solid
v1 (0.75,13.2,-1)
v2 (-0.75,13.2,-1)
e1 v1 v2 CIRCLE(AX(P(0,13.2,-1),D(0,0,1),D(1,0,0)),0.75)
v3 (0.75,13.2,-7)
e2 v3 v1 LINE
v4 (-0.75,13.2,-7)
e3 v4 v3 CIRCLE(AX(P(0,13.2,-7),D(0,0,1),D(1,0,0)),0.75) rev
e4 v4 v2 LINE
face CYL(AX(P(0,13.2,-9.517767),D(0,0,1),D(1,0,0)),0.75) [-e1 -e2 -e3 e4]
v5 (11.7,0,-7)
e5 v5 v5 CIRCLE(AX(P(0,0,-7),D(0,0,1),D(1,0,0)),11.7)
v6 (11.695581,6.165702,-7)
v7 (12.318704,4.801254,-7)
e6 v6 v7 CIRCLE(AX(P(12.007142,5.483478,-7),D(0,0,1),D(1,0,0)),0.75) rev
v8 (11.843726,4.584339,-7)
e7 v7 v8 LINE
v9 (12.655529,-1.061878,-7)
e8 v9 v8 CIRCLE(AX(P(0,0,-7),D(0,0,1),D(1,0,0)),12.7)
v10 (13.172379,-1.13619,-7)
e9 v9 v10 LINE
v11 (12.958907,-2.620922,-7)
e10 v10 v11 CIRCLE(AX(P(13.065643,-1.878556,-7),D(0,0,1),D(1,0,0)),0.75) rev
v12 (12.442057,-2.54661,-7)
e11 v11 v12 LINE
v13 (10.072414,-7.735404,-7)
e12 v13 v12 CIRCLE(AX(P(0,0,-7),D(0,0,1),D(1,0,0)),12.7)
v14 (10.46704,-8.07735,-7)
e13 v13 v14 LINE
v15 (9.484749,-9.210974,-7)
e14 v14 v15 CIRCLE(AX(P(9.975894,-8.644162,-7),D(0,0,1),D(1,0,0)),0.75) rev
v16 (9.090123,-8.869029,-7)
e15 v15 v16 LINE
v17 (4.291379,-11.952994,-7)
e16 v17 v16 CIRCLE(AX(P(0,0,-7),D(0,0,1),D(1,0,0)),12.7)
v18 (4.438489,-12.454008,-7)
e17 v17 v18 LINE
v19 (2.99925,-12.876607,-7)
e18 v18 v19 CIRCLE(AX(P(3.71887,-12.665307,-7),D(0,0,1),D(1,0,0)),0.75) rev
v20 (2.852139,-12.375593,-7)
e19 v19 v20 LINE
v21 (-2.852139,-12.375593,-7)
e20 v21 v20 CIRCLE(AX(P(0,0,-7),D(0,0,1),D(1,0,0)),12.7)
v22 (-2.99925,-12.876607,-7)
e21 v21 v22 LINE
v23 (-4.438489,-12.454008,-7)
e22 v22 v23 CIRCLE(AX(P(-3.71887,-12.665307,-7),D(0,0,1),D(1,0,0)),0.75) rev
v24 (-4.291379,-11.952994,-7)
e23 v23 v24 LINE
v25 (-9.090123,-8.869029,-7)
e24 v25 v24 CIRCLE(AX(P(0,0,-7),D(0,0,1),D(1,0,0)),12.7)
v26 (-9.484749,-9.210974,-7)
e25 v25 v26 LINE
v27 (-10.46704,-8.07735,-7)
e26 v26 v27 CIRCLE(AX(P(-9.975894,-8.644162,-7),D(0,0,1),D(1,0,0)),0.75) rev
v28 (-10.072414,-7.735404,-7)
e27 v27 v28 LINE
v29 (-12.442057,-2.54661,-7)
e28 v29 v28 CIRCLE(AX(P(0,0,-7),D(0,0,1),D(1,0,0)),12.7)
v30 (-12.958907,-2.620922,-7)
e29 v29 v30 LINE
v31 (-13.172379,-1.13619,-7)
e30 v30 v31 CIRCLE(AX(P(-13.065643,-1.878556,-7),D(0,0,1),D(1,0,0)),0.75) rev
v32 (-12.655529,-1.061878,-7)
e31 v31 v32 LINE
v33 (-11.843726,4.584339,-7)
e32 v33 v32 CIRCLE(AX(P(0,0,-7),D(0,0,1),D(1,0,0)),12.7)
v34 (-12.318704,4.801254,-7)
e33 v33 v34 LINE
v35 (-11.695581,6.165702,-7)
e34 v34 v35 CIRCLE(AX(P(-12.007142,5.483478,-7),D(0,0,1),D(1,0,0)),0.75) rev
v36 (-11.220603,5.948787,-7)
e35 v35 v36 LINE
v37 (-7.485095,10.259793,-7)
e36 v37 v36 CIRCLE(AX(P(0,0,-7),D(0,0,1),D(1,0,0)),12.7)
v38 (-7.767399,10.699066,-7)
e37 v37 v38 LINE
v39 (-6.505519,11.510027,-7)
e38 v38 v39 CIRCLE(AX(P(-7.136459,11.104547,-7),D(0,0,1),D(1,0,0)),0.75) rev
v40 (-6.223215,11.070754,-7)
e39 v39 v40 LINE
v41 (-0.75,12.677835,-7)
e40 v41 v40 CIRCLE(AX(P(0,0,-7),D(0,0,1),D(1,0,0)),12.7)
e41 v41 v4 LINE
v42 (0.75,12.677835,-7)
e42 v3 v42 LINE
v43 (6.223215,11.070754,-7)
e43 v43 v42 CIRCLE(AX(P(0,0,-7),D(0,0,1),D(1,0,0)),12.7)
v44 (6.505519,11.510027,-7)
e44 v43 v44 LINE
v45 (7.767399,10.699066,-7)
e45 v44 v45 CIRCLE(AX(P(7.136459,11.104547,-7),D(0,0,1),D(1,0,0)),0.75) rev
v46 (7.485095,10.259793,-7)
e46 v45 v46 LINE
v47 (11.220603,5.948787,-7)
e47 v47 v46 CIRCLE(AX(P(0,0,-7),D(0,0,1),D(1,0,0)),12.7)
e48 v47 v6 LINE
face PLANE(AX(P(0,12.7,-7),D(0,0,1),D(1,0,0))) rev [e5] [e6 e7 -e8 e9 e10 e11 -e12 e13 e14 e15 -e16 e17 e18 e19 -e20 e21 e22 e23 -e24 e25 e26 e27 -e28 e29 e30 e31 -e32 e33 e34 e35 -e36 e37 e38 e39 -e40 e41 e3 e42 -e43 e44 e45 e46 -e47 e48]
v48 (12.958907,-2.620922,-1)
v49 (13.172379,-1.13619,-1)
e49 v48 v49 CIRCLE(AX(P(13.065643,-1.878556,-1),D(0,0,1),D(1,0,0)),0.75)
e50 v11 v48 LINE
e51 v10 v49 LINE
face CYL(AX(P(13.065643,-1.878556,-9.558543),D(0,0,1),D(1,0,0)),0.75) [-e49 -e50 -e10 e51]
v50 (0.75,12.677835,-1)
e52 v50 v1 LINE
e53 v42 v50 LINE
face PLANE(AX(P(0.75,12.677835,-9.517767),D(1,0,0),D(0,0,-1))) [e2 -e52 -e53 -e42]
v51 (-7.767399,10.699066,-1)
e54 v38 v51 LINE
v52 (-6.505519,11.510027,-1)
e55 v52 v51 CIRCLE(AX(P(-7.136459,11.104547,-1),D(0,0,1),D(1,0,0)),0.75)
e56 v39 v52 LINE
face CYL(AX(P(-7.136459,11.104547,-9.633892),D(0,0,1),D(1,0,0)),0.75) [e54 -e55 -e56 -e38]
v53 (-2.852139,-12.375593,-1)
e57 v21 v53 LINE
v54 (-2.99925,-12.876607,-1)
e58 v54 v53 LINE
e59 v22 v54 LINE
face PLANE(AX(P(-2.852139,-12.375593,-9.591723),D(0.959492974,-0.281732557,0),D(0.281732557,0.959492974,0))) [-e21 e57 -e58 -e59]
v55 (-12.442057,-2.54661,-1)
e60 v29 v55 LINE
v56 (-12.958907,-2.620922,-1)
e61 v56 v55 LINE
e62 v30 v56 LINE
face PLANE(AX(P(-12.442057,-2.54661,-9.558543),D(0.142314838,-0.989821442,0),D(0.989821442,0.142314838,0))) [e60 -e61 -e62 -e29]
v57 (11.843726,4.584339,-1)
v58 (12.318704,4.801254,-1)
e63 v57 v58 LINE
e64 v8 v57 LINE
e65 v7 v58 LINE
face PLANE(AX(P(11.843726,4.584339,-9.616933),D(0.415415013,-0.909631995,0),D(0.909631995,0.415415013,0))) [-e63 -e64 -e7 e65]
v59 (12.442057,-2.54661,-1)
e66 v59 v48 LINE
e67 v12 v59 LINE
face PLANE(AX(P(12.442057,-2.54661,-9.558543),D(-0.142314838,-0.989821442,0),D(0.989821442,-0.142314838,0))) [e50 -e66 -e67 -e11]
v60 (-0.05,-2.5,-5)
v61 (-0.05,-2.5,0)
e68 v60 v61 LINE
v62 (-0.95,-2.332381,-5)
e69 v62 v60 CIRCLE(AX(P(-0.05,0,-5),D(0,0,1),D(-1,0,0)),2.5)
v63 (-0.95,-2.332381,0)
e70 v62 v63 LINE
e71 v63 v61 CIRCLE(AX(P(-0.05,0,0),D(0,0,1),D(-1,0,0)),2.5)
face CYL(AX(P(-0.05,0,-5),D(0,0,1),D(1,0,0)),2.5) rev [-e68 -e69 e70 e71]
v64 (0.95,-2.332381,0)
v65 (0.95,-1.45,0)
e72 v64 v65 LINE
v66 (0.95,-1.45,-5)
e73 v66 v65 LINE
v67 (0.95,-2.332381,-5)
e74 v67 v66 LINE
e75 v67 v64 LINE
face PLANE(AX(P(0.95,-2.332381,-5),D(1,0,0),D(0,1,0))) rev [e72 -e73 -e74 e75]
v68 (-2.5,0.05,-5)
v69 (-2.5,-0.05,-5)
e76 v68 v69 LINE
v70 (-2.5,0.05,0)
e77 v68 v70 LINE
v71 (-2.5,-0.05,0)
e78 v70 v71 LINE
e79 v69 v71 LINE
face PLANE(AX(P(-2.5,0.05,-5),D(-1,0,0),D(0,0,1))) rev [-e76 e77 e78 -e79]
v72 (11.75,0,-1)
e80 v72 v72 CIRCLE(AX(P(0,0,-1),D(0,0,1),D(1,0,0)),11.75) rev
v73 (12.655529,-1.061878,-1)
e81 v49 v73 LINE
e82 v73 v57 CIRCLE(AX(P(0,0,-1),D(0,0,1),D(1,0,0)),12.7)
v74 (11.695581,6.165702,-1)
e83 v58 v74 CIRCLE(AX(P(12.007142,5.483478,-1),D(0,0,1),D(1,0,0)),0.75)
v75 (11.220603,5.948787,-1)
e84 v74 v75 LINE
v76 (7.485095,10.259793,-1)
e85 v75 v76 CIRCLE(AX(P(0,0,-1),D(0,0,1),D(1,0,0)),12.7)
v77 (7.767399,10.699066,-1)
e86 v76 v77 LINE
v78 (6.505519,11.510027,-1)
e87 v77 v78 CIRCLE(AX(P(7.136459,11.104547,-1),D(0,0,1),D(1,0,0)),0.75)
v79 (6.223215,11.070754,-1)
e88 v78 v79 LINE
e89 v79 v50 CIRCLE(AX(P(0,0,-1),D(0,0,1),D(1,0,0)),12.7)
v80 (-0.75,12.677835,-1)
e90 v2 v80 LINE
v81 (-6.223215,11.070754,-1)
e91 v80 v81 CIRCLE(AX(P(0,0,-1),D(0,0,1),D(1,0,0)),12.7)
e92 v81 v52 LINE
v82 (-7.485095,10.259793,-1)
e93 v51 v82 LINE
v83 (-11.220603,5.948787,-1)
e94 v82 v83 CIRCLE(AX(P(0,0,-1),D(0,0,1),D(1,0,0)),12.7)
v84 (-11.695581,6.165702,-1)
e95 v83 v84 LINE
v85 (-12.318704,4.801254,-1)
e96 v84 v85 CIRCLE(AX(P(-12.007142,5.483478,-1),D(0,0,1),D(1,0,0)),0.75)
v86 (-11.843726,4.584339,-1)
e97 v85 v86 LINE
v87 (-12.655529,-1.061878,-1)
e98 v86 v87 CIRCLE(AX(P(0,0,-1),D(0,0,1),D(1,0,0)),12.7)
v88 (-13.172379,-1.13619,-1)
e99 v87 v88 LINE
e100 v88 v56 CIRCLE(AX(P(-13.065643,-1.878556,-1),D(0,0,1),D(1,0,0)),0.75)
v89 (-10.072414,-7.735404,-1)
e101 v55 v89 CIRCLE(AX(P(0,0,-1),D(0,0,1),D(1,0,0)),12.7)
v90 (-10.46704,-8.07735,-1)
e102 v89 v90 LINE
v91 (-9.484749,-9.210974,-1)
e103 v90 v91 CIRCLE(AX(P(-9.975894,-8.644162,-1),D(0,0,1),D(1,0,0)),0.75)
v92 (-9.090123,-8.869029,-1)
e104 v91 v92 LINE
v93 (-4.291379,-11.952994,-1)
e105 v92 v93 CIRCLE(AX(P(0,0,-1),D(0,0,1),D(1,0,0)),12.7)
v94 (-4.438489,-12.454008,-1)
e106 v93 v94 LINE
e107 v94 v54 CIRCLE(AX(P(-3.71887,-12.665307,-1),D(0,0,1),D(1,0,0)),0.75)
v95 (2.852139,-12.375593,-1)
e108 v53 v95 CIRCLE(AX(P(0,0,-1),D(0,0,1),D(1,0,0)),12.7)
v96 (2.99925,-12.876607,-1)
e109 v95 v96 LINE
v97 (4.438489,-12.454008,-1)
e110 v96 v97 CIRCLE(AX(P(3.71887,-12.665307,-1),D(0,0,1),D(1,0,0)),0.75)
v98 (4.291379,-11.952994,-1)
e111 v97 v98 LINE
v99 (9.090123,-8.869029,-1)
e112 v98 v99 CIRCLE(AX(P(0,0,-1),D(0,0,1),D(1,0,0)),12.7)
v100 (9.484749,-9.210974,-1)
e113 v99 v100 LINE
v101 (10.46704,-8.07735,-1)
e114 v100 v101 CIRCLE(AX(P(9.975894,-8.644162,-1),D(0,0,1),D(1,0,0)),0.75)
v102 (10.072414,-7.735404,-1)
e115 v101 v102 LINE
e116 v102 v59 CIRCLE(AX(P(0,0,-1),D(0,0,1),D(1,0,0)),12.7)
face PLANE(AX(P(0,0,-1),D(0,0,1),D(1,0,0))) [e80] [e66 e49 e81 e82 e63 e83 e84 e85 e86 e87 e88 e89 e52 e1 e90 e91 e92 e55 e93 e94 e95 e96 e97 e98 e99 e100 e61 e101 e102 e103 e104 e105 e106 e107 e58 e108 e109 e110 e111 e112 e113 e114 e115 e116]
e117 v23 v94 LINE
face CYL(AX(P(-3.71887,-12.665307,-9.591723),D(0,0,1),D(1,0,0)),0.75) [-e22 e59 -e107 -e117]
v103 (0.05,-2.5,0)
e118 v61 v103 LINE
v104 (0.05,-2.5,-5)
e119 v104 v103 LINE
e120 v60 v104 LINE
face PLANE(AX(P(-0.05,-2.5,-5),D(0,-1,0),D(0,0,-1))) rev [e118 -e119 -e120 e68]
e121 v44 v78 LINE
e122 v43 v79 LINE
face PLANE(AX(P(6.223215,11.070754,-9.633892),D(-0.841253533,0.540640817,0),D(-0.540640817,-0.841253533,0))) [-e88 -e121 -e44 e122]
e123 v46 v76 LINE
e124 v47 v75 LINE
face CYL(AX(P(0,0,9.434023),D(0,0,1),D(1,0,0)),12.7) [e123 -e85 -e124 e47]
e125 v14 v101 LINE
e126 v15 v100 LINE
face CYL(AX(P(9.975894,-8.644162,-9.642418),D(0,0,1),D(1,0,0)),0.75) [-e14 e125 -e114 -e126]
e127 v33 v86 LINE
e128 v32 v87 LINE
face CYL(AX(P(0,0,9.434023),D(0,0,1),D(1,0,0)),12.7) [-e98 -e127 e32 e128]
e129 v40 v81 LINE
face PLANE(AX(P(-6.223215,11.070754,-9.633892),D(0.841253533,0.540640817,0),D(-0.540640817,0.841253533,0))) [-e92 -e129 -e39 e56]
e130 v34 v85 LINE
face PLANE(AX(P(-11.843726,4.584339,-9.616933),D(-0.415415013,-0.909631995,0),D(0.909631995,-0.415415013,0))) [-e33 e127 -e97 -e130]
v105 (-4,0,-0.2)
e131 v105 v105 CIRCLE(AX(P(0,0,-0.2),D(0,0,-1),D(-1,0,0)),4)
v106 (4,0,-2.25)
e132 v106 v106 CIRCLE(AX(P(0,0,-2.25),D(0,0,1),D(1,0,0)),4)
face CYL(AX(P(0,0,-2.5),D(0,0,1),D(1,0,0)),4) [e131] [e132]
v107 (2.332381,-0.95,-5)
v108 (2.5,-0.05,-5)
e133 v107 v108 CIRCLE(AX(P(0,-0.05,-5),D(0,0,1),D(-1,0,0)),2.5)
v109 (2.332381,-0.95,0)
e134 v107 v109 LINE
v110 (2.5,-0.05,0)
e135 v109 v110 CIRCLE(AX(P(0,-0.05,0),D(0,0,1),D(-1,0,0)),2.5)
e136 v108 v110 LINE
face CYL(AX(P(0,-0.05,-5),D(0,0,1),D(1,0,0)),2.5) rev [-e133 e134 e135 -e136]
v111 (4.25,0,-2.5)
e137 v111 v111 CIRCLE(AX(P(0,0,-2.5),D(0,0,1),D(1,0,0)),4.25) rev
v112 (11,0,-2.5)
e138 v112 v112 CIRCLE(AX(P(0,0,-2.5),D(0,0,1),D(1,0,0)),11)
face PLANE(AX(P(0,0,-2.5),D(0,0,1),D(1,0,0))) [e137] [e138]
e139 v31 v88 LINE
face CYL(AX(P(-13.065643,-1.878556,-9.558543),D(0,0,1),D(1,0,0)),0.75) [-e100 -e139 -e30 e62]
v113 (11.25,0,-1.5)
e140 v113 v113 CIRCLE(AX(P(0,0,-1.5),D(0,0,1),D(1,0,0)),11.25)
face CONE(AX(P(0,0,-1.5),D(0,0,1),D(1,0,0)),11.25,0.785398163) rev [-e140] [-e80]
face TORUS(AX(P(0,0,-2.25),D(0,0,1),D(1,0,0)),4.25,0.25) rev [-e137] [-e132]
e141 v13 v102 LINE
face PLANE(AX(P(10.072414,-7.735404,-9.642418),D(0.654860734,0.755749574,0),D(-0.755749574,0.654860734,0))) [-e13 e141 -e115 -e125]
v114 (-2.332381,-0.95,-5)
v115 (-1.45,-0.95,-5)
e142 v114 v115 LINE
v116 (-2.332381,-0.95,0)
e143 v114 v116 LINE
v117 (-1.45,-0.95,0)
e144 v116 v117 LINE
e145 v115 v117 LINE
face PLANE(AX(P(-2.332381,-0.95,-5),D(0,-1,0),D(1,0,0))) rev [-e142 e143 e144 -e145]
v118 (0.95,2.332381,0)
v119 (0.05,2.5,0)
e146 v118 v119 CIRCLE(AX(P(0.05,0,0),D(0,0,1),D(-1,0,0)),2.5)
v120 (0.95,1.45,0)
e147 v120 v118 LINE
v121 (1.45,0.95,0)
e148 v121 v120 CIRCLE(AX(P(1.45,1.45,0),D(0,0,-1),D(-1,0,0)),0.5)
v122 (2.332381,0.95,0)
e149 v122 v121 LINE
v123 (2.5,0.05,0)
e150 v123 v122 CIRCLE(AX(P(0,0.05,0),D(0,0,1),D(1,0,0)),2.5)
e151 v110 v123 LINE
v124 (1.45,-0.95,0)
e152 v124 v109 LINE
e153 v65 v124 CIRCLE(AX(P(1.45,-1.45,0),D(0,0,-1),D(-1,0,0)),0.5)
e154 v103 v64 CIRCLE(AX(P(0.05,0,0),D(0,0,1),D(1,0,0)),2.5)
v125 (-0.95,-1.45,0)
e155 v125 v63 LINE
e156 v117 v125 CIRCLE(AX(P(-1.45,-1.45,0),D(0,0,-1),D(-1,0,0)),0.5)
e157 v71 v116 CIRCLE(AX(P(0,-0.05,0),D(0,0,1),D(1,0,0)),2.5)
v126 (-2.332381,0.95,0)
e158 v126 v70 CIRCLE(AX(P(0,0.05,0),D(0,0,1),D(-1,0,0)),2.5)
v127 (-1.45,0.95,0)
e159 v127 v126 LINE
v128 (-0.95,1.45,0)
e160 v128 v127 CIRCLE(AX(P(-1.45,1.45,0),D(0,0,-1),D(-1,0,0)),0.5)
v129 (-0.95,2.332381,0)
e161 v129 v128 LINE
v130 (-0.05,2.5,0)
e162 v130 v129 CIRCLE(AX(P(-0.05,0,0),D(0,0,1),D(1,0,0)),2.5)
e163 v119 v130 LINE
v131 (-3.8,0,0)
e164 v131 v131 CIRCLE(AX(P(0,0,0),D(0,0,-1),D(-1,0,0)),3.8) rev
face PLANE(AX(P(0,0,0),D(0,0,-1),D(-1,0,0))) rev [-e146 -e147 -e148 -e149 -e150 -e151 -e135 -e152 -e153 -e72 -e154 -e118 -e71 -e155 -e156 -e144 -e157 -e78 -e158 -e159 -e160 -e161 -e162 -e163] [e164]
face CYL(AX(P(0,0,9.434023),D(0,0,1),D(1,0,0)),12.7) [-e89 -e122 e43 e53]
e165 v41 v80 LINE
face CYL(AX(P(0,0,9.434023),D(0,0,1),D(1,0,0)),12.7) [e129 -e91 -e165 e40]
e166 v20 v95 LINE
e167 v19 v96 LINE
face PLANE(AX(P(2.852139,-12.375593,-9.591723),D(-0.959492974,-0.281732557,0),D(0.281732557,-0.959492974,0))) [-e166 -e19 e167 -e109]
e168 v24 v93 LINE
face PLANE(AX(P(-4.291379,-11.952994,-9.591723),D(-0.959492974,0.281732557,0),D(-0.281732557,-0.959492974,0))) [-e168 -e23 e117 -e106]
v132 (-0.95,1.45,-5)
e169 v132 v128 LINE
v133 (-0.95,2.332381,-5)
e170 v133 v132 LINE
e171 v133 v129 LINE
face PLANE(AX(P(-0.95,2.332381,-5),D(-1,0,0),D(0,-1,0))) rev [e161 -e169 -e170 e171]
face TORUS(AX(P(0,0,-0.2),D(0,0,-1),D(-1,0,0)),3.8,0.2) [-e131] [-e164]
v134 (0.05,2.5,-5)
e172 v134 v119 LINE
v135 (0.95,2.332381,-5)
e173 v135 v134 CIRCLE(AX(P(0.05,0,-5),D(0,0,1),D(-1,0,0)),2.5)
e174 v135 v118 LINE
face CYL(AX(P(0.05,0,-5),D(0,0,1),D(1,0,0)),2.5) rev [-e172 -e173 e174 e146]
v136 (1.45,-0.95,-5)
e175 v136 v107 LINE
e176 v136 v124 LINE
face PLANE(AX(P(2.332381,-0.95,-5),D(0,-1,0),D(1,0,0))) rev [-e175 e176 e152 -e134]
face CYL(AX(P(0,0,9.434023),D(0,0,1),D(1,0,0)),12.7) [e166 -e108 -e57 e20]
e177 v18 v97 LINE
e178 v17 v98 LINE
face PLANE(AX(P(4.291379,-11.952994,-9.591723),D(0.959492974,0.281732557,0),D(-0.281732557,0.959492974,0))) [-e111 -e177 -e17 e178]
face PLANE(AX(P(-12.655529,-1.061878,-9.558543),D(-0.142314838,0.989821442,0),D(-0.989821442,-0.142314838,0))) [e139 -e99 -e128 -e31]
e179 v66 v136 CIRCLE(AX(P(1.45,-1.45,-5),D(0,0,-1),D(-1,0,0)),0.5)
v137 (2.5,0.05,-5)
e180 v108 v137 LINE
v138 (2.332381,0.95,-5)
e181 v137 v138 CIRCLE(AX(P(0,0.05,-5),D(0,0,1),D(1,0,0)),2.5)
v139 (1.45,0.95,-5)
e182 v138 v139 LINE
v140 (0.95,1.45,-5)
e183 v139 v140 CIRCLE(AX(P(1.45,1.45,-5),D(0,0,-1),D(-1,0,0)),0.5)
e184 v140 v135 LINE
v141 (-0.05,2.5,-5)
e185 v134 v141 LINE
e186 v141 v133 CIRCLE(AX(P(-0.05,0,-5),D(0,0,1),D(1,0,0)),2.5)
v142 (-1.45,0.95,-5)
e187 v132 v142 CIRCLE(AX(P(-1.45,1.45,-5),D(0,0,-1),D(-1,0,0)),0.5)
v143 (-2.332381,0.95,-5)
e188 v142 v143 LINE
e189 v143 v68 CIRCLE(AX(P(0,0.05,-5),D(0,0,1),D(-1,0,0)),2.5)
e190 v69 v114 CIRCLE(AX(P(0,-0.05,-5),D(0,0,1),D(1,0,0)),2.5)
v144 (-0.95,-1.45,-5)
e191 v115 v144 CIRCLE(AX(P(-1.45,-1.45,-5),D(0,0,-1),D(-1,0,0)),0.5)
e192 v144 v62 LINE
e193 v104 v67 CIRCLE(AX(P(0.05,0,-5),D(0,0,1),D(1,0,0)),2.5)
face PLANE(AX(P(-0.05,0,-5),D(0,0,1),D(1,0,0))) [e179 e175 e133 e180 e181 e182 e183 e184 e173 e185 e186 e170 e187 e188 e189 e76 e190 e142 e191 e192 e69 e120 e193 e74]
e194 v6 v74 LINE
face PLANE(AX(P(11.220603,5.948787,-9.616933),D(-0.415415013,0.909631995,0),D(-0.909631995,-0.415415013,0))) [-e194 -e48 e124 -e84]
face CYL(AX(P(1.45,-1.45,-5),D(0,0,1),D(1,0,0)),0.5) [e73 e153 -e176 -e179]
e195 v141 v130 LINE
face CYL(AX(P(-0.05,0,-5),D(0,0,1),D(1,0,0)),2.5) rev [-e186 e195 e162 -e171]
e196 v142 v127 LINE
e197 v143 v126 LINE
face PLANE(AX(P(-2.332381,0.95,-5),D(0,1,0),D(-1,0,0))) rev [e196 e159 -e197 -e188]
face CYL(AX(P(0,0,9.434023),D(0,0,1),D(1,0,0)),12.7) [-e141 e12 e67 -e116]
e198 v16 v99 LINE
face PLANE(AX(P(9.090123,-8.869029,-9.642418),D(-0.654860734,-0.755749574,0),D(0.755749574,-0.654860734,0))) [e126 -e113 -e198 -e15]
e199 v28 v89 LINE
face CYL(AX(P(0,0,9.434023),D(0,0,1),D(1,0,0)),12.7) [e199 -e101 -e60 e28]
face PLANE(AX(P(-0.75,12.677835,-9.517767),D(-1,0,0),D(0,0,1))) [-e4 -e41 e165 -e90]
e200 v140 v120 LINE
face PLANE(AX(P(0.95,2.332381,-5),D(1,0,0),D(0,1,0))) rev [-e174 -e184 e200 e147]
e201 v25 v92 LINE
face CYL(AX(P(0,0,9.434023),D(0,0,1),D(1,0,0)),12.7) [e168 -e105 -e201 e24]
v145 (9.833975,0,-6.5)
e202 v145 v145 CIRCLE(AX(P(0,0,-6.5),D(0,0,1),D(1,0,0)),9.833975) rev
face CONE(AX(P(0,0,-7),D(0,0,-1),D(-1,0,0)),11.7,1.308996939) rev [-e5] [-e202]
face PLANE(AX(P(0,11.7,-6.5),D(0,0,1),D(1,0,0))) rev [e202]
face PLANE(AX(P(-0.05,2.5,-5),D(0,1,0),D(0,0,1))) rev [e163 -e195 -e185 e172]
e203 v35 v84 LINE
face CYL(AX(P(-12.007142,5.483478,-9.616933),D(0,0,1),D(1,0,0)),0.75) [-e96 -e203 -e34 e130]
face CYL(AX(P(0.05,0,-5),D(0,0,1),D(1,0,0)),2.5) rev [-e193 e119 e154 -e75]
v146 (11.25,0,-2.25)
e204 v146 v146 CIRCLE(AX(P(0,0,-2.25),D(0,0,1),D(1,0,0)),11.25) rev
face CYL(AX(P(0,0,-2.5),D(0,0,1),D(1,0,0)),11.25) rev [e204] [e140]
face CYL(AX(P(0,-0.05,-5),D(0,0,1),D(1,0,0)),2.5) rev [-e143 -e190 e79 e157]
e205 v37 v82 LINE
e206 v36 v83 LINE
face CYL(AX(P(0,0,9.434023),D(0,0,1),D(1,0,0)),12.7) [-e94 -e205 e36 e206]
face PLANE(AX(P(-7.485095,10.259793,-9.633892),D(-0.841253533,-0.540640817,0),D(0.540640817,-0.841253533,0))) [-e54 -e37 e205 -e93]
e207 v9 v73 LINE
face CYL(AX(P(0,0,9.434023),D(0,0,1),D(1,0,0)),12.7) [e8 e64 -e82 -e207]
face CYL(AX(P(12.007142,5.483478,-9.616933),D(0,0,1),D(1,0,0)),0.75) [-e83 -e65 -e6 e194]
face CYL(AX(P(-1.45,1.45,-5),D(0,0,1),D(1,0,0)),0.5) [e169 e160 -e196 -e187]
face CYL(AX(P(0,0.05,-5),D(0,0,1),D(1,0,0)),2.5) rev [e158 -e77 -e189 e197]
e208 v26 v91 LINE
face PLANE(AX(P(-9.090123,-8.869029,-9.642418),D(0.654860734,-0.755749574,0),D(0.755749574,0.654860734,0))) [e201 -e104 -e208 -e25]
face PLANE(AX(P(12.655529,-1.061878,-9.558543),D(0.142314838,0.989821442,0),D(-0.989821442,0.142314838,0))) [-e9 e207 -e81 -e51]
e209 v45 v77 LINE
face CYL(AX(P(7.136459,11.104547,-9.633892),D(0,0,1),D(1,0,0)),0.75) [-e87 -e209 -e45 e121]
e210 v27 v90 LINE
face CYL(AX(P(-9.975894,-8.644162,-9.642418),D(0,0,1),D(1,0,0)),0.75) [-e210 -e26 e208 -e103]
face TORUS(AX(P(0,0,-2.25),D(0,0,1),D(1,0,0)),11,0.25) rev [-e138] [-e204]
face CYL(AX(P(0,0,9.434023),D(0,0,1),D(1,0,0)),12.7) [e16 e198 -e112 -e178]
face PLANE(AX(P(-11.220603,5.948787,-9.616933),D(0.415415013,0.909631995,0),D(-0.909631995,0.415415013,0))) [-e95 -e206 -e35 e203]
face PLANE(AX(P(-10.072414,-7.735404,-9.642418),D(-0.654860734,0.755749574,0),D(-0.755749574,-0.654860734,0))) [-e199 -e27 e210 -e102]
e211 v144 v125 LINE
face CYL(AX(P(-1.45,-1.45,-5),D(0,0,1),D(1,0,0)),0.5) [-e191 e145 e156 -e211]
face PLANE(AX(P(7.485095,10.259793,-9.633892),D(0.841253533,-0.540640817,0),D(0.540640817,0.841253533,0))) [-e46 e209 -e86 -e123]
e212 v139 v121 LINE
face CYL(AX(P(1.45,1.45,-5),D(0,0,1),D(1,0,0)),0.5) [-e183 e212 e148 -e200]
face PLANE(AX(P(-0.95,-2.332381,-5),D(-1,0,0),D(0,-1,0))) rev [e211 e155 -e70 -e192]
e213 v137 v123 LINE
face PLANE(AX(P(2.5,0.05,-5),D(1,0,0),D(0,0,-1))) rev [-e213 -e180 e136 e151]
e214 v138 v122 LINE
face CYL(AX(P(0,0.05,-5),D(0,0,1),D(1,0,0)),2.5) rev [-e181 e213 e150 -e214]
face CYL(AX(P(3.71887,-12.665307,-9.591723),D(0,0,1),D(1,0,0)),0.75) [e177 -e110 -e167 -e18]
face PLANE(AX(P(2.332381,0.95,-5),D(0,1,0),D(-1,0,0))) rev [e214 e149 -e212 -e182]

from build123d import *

# Parameters (mm, degrees)
BOSS_EXTRUDE1_DEPTH = 7
CIRPATTERN1_COUNT   = 11
CUT_EXTRUDE1_DEPTH  = 5
SKETCH4_R           = 11.25
SKETCH4_R_2         = 4
CUT_EXTRUDE2_DEPTH  = 2.5
CUT_EXTRUDE3_START  = -1
SKETCH6_R           = 11.25
CUT_EXTRUDE3_DEPTH  = 1
CHAMFER1_SIZE       = 0.5
FILLET1_R           = 0.25
FILLET2_R           = 0.2
CHAMFER2_SIZE       = 0.5
CHAMFER2_SIZE_2     = 1.866025404


with BuildPart() as part:
    # Sketch1 → Revolve1 (revolve)
    with BuildSketch(Plane(origin=(0, 0, 0), x_dir=(0, 0, -1), z_dir=(1, 0, 0)), mode=Mode.PRIVATE) as revolve1_sk:
        Polygon((0, 12.7), (7, 12.7), (7, 11.7), (6.5, 11.7), (6.5, 0), (0, 0), align=None)
    revolve(revolve1_sk.sketch.rotate(Axis((0, 0, 9.434023018), (0, 0, -1)), 90), axis=Axis((0, 0, 9.434023018), (0, 0, -1)))

    # Sketch2 → Boss-Extrude1 (add)
    with BuildSketch(Plane.XY):
        with BuildLine():
            Line((-0.75, 12.677834989), (-0.75, 13.2))
            ThreePointArc((-0.75, 13.2), (0, 13.95), (0.75, 13.2))
            Line((0.75, 13.2), (0.75, 12.677834989))
            ThreePointArc((0.75, 12.677834989), (0, 11.927834989), (-0.75, 12.677834989))
        make_face()
    boss_extrude1 = extrude(amount=-BOSS_EXTRUDE1_DEPTH)

    # CirPattern1: Boss-Extrude1 ×11 about axis
    cirpattern1_axis = Axis((0, 0, 0), (0, 0, 1))
    for i in range(1, CIRPATTERN1_COUNT):
        add(boss_extrude1.rotate(cirpattern1_axis, i * 360 / CIRPATTERN1_COUNT))

    # Sketch3 → Cut-Extrude1 (cut)
    with BuildSketch(Plane.XY):
        with BuildLine():
            Line((-0.95, 2.332380758), (-0.95, 1.45))
            ThreePointArc((-0.95, 1.45), (-1.096446609, 1.096446609), (-1.45, 0.95))
            Line((-1.45, 0.95), (-2.332380758, 0.95))
            ThreePointArc((-2.332380758, 0.95), (-2.457737974, 0.507737974), (-2.5, 0.05))
            Line((-2.5, 0.05), (-2.5, -0.05))
            ThreePointArc((-2.5, -0.05), (-2.457737974, -0.507737974), (-2.332380758, -0.95))
            Line((-2.332380758, -0.95), (-1.45, -0.95))
            ThreePointArc((-1.45, -0.95), (-1.096446609, -1.096446609), (-0.95, -1.45))
            Line((-0.95, -1.45), (-0.95, -2.332380758))
            ThreePointArc((-0.95, -2.332380758), (-0.507737974, -2.457737974), (-0.05, -2.5))
            Line((-0.05, -2.5), (0.05, -2.5))
            ThreePointArc((0.05, -2.5), (0.507737974, -2.457737974), (0.95, -2.332380758))
            Line((0.95, -2.332380758), (0.95, -1.45))
            ThreePointArc((0.95, -1.45), (1.096446609, -1.096446609), (1.45, -0.95))
            Line((1.45, -0.95), (2.332380758, -0.95))
            ThreePointArc((2.332380758, -0.95), (2.457737974, -0.507737974), (2.5, -0.05))
            Line((2.5, -0.05), (2.5, 0.05))
            ThreePointArc((2.5, 0.05), (2.457737974, 0.507737974), (2.332380758, 0.95))
            Line((2.332380758, 0.95), (1.45, 0.95))
            ThreePointArc((1.45, 0.95), (1.096446609, 1.096446609), (0.95, 1.45))
            Line((0.95, 1.45), (0.95, 2.332380758))
            ThreePointArc((0.95, 2.332380758), (0.507737974, 2.457737974), (0.05, 2.5))
            Line((0.05, 2.5), (-0.05, 2.5))
            ThreePointArc((-0.05, 2.5), (-0.507737974, 2.457737974), (-0.95, 2.332380758))
        make_face()
    extrude(amount=-CUT_EXTRUDE1_DEPTH, mode=Mode.SUBTRACT)

    # Sketch4 → Cut-Extrude2 (cut)
    with BuildSketch(Plane.XY):
        Circle(SKETCH4_R)
        Circle(SKETCH4_R_2, mode=Mode.SUBTRACT)
    extrude(amount=-CUT_EXTRUDE2_DEPTH, mode=Mode.SUBTRACT)

    # Sketch6 → Cut-Extrude3 (cut)
    with BuildSketch(Plane.XY.offset(CUT_EXTRUDE3_START)):
        with BuildLine():
            Line((-6.223214922, 11.070754086), (-6.505518641, 11.510027246))
            ThreePointArc((-6.505518641, 11.510027246), (-7.541939404, 11.735486783), (-7.76739894, 10.69906602))
            Line((-7.76739894, 10.69906602), (-7.485095221, 10.25979286))
            ThreePointArc((-7.485095221, 10.25979286), (-9.598019594, 8.316731321), (-11.220603078, 5.948786983))
            Line((-11.220603078, 5.948786983), (-11.695581079, 6.165702168))
            ThreePointArc((-11.695581079, 6.165702168), (-12.689366335, 5.795039431), (-12.318703598, 4.801254175))
            Line((-12.318703598, 4.801254175), (-11.843725597, 4.58433899))
            ThreePointArc((-11.843725597, 4.58433899), (-12.570732312, 1.807398446), (-12.655529037, -1.061877955))
            Line((-12.655529037, -1.061877955), (-13.172379162, -1.136189784))
            ThreePointArc((-13.172379162, -1.136189784), (-13.808009114, -1.985291994), (-12.958906904, -2.620921947))
            Line((-12.958906904, -2.620921947), (-12.44205678, -2.546610117))
            ThreePointArc((-12.44205678, -2.546610117), (-11.552326341, -5.275770665), (-10.072413947, -7.735404145))
            Line((-10.072413947, -7.735404145), (-10.467039932, -8.077349507))
            ThreePointArc((-10.467039932, -8.077349507), (-10.542706562, -9.135307239), (-9.484748831, -9.210973869))
            Line((-9.484748831, -9.210973869), (-9.090122846, -8.869028506))
            ThreePointArc((-9.090122846, -8.869028506), (-6.866138382, -10.683919867), (-4.291378597, -11.952994175))
            Line((-4.291378597, -11.952994175), (-4.438489481, -12.454007834))
            ThreePointArc((-4.438489481, -12.454007834), (-3.930169168, -13.384926982), (-2.99925002, -12.876606669))
            Line((-2.99925002, -12.876606669), (-2.852139136, -12.37559301))
            ThreePointArc((-2.852139136, -12.37559301), (0, -12.7), (2.852139136, -12.37559301))
            Line((2.852139136, -12.37559301), (2.99925002, -12.876606669))
            ThreePointArc((2.99925002, -12.876606669), (3.930169168, -13.384926982), (4.438489481, -12.454007834))
            Line((4.438489481, -12.454007834), (4.291378597, -11.952994175))
            ThreePointArc((4.291378597, -11.952994175), (6.866138382, -10.683919867), (9.090122846, -8.869028506))
            Line((9.090122846, -8.869028506), (9.484748831, -9.210973869))
            ThreePointArc((9.484748831, -9.210973869), (10.542706562, -9.135307239), (10.467039932, -8.077349507))
            Line((10.467039932, -8.077349507), (10.072413947, -7.735404145))
            ThreePointArc((10.072413947, -7.735404145), (11.552326341, -5.275770665), (12.44205678, -2.546610117))
            Line((12.44205678, -2.546610117), (12.958906904, -2.620921947))
            ThreePointArc((12.958906904, -2.620921947), (13.808009114, -1.985291994), (13.172379162, -1.136189784))
            Line((13.172379162, -1.136189784), (12.655529037, -1.061877955))
            ThreePointArc((12.655529037, -1.061877955), (12.570732312, 1.807398446), (11.843725597, 4.58433899))
            Line((11.843725597, 4.58433899), (12.318703598, 4.801254175))
            ThreePointArc((12.318703598, 4.801254175), (12.689366335, 5.795039431), (11.695581079, 6.165702168))
            Line((11.695581079, 6.165702168), (11.220603078, 5.948786983))
            ThreePointArc((11.220603078, 5.948786983), (9.598019594, 8.316731321), (7.485095221, 10.25979286))
            Line((7.485095221, 10.25979286), (7.76739894, 10.69906602))
            ThreePointArc((7.76739894, 10.69906602), (7.541939404, 11.735486783), (6.505518641, 11.510027246))
            Line((6.505518641, 11.510027246), (6.223214922, 11.070754086))
            ThreePointArc((6.223214922, 11.070754086), (3.578003472, 12.185560765), (0.75, 12.677834989))
            Line((0.75, 12.677834989), (0.75, 13.2))
            ThreePointArc((0.75, 13.2), (0, 13.95), (-0.75, 13.2))
            Line((-0.75, 13.2), (-0.75, 12.677834989))
            ThreePointArc((-0.75, 12.677834989), (-3.578003472, 12.185560765), (-6.223214922, 11.070754086))
        make_face()
        Circle(SKETCH6_R, mode=Mode.SUBTRACT)
    extrude(amount=CUT_EXTRUDE3_DEPTH, mode=Mode.SUBTRACT)

    # Chamfer1
    chamfer1_edges = [part.edges().sort_by_distance(p)[0] for p in [
        (-11.25, 0, -1),
    ]]
    chamfer(chamfer1_edges, length=CHAMFER1_SIZE)

    # Fillet1
    fillet1_edges = [part.edges().sort_by_distance(p)[0] for p in [
        (-11.25, 0, -2.5),
        (-4, 0, -2.5),
    ]]
    fillet(fillet1_edges, radius=FILLET1_R)

    # Fillet2
    fillet2_edges = [part.edges().sort_by_distance(p)[0] for p in [
        (-4, 0, 0),
    ]]
    fillet(fillet2_edges, radius=FILLET2_R)

    # Chamfer2
    # the kernel refuses this chamfer: 1.866025404, 0.5 mm, written as the material it adds along each edge
    with BuildSketch(Plane(origin=(0, 0, -6.5), x_dir=(1, 0, 0), z_dir=(0, 1, 0))) as chamfer2_piece_1_section:
        Polygon((11.7, CHAMFER2_SIZE), (11.7 - CHAMFER2_SIZE_2, 0), (11.7, 0), align=None)
    chamfer2_piece_1 = revolve(axis=Axis((0, 0, -6.5), (0, 0, -1)), mode=Mode.PRIVATE)
    chamfer2_piece_1 = split(chamfer2_piece_1, bisect_by=Plane(origin=(-10.739750949, 0, -7), z_dir=(0, 0, 1)), keep=Keep.TOP, mode=Mode.PRIVATE)
    add(chamfer2_piece_1)


solid = part.part
